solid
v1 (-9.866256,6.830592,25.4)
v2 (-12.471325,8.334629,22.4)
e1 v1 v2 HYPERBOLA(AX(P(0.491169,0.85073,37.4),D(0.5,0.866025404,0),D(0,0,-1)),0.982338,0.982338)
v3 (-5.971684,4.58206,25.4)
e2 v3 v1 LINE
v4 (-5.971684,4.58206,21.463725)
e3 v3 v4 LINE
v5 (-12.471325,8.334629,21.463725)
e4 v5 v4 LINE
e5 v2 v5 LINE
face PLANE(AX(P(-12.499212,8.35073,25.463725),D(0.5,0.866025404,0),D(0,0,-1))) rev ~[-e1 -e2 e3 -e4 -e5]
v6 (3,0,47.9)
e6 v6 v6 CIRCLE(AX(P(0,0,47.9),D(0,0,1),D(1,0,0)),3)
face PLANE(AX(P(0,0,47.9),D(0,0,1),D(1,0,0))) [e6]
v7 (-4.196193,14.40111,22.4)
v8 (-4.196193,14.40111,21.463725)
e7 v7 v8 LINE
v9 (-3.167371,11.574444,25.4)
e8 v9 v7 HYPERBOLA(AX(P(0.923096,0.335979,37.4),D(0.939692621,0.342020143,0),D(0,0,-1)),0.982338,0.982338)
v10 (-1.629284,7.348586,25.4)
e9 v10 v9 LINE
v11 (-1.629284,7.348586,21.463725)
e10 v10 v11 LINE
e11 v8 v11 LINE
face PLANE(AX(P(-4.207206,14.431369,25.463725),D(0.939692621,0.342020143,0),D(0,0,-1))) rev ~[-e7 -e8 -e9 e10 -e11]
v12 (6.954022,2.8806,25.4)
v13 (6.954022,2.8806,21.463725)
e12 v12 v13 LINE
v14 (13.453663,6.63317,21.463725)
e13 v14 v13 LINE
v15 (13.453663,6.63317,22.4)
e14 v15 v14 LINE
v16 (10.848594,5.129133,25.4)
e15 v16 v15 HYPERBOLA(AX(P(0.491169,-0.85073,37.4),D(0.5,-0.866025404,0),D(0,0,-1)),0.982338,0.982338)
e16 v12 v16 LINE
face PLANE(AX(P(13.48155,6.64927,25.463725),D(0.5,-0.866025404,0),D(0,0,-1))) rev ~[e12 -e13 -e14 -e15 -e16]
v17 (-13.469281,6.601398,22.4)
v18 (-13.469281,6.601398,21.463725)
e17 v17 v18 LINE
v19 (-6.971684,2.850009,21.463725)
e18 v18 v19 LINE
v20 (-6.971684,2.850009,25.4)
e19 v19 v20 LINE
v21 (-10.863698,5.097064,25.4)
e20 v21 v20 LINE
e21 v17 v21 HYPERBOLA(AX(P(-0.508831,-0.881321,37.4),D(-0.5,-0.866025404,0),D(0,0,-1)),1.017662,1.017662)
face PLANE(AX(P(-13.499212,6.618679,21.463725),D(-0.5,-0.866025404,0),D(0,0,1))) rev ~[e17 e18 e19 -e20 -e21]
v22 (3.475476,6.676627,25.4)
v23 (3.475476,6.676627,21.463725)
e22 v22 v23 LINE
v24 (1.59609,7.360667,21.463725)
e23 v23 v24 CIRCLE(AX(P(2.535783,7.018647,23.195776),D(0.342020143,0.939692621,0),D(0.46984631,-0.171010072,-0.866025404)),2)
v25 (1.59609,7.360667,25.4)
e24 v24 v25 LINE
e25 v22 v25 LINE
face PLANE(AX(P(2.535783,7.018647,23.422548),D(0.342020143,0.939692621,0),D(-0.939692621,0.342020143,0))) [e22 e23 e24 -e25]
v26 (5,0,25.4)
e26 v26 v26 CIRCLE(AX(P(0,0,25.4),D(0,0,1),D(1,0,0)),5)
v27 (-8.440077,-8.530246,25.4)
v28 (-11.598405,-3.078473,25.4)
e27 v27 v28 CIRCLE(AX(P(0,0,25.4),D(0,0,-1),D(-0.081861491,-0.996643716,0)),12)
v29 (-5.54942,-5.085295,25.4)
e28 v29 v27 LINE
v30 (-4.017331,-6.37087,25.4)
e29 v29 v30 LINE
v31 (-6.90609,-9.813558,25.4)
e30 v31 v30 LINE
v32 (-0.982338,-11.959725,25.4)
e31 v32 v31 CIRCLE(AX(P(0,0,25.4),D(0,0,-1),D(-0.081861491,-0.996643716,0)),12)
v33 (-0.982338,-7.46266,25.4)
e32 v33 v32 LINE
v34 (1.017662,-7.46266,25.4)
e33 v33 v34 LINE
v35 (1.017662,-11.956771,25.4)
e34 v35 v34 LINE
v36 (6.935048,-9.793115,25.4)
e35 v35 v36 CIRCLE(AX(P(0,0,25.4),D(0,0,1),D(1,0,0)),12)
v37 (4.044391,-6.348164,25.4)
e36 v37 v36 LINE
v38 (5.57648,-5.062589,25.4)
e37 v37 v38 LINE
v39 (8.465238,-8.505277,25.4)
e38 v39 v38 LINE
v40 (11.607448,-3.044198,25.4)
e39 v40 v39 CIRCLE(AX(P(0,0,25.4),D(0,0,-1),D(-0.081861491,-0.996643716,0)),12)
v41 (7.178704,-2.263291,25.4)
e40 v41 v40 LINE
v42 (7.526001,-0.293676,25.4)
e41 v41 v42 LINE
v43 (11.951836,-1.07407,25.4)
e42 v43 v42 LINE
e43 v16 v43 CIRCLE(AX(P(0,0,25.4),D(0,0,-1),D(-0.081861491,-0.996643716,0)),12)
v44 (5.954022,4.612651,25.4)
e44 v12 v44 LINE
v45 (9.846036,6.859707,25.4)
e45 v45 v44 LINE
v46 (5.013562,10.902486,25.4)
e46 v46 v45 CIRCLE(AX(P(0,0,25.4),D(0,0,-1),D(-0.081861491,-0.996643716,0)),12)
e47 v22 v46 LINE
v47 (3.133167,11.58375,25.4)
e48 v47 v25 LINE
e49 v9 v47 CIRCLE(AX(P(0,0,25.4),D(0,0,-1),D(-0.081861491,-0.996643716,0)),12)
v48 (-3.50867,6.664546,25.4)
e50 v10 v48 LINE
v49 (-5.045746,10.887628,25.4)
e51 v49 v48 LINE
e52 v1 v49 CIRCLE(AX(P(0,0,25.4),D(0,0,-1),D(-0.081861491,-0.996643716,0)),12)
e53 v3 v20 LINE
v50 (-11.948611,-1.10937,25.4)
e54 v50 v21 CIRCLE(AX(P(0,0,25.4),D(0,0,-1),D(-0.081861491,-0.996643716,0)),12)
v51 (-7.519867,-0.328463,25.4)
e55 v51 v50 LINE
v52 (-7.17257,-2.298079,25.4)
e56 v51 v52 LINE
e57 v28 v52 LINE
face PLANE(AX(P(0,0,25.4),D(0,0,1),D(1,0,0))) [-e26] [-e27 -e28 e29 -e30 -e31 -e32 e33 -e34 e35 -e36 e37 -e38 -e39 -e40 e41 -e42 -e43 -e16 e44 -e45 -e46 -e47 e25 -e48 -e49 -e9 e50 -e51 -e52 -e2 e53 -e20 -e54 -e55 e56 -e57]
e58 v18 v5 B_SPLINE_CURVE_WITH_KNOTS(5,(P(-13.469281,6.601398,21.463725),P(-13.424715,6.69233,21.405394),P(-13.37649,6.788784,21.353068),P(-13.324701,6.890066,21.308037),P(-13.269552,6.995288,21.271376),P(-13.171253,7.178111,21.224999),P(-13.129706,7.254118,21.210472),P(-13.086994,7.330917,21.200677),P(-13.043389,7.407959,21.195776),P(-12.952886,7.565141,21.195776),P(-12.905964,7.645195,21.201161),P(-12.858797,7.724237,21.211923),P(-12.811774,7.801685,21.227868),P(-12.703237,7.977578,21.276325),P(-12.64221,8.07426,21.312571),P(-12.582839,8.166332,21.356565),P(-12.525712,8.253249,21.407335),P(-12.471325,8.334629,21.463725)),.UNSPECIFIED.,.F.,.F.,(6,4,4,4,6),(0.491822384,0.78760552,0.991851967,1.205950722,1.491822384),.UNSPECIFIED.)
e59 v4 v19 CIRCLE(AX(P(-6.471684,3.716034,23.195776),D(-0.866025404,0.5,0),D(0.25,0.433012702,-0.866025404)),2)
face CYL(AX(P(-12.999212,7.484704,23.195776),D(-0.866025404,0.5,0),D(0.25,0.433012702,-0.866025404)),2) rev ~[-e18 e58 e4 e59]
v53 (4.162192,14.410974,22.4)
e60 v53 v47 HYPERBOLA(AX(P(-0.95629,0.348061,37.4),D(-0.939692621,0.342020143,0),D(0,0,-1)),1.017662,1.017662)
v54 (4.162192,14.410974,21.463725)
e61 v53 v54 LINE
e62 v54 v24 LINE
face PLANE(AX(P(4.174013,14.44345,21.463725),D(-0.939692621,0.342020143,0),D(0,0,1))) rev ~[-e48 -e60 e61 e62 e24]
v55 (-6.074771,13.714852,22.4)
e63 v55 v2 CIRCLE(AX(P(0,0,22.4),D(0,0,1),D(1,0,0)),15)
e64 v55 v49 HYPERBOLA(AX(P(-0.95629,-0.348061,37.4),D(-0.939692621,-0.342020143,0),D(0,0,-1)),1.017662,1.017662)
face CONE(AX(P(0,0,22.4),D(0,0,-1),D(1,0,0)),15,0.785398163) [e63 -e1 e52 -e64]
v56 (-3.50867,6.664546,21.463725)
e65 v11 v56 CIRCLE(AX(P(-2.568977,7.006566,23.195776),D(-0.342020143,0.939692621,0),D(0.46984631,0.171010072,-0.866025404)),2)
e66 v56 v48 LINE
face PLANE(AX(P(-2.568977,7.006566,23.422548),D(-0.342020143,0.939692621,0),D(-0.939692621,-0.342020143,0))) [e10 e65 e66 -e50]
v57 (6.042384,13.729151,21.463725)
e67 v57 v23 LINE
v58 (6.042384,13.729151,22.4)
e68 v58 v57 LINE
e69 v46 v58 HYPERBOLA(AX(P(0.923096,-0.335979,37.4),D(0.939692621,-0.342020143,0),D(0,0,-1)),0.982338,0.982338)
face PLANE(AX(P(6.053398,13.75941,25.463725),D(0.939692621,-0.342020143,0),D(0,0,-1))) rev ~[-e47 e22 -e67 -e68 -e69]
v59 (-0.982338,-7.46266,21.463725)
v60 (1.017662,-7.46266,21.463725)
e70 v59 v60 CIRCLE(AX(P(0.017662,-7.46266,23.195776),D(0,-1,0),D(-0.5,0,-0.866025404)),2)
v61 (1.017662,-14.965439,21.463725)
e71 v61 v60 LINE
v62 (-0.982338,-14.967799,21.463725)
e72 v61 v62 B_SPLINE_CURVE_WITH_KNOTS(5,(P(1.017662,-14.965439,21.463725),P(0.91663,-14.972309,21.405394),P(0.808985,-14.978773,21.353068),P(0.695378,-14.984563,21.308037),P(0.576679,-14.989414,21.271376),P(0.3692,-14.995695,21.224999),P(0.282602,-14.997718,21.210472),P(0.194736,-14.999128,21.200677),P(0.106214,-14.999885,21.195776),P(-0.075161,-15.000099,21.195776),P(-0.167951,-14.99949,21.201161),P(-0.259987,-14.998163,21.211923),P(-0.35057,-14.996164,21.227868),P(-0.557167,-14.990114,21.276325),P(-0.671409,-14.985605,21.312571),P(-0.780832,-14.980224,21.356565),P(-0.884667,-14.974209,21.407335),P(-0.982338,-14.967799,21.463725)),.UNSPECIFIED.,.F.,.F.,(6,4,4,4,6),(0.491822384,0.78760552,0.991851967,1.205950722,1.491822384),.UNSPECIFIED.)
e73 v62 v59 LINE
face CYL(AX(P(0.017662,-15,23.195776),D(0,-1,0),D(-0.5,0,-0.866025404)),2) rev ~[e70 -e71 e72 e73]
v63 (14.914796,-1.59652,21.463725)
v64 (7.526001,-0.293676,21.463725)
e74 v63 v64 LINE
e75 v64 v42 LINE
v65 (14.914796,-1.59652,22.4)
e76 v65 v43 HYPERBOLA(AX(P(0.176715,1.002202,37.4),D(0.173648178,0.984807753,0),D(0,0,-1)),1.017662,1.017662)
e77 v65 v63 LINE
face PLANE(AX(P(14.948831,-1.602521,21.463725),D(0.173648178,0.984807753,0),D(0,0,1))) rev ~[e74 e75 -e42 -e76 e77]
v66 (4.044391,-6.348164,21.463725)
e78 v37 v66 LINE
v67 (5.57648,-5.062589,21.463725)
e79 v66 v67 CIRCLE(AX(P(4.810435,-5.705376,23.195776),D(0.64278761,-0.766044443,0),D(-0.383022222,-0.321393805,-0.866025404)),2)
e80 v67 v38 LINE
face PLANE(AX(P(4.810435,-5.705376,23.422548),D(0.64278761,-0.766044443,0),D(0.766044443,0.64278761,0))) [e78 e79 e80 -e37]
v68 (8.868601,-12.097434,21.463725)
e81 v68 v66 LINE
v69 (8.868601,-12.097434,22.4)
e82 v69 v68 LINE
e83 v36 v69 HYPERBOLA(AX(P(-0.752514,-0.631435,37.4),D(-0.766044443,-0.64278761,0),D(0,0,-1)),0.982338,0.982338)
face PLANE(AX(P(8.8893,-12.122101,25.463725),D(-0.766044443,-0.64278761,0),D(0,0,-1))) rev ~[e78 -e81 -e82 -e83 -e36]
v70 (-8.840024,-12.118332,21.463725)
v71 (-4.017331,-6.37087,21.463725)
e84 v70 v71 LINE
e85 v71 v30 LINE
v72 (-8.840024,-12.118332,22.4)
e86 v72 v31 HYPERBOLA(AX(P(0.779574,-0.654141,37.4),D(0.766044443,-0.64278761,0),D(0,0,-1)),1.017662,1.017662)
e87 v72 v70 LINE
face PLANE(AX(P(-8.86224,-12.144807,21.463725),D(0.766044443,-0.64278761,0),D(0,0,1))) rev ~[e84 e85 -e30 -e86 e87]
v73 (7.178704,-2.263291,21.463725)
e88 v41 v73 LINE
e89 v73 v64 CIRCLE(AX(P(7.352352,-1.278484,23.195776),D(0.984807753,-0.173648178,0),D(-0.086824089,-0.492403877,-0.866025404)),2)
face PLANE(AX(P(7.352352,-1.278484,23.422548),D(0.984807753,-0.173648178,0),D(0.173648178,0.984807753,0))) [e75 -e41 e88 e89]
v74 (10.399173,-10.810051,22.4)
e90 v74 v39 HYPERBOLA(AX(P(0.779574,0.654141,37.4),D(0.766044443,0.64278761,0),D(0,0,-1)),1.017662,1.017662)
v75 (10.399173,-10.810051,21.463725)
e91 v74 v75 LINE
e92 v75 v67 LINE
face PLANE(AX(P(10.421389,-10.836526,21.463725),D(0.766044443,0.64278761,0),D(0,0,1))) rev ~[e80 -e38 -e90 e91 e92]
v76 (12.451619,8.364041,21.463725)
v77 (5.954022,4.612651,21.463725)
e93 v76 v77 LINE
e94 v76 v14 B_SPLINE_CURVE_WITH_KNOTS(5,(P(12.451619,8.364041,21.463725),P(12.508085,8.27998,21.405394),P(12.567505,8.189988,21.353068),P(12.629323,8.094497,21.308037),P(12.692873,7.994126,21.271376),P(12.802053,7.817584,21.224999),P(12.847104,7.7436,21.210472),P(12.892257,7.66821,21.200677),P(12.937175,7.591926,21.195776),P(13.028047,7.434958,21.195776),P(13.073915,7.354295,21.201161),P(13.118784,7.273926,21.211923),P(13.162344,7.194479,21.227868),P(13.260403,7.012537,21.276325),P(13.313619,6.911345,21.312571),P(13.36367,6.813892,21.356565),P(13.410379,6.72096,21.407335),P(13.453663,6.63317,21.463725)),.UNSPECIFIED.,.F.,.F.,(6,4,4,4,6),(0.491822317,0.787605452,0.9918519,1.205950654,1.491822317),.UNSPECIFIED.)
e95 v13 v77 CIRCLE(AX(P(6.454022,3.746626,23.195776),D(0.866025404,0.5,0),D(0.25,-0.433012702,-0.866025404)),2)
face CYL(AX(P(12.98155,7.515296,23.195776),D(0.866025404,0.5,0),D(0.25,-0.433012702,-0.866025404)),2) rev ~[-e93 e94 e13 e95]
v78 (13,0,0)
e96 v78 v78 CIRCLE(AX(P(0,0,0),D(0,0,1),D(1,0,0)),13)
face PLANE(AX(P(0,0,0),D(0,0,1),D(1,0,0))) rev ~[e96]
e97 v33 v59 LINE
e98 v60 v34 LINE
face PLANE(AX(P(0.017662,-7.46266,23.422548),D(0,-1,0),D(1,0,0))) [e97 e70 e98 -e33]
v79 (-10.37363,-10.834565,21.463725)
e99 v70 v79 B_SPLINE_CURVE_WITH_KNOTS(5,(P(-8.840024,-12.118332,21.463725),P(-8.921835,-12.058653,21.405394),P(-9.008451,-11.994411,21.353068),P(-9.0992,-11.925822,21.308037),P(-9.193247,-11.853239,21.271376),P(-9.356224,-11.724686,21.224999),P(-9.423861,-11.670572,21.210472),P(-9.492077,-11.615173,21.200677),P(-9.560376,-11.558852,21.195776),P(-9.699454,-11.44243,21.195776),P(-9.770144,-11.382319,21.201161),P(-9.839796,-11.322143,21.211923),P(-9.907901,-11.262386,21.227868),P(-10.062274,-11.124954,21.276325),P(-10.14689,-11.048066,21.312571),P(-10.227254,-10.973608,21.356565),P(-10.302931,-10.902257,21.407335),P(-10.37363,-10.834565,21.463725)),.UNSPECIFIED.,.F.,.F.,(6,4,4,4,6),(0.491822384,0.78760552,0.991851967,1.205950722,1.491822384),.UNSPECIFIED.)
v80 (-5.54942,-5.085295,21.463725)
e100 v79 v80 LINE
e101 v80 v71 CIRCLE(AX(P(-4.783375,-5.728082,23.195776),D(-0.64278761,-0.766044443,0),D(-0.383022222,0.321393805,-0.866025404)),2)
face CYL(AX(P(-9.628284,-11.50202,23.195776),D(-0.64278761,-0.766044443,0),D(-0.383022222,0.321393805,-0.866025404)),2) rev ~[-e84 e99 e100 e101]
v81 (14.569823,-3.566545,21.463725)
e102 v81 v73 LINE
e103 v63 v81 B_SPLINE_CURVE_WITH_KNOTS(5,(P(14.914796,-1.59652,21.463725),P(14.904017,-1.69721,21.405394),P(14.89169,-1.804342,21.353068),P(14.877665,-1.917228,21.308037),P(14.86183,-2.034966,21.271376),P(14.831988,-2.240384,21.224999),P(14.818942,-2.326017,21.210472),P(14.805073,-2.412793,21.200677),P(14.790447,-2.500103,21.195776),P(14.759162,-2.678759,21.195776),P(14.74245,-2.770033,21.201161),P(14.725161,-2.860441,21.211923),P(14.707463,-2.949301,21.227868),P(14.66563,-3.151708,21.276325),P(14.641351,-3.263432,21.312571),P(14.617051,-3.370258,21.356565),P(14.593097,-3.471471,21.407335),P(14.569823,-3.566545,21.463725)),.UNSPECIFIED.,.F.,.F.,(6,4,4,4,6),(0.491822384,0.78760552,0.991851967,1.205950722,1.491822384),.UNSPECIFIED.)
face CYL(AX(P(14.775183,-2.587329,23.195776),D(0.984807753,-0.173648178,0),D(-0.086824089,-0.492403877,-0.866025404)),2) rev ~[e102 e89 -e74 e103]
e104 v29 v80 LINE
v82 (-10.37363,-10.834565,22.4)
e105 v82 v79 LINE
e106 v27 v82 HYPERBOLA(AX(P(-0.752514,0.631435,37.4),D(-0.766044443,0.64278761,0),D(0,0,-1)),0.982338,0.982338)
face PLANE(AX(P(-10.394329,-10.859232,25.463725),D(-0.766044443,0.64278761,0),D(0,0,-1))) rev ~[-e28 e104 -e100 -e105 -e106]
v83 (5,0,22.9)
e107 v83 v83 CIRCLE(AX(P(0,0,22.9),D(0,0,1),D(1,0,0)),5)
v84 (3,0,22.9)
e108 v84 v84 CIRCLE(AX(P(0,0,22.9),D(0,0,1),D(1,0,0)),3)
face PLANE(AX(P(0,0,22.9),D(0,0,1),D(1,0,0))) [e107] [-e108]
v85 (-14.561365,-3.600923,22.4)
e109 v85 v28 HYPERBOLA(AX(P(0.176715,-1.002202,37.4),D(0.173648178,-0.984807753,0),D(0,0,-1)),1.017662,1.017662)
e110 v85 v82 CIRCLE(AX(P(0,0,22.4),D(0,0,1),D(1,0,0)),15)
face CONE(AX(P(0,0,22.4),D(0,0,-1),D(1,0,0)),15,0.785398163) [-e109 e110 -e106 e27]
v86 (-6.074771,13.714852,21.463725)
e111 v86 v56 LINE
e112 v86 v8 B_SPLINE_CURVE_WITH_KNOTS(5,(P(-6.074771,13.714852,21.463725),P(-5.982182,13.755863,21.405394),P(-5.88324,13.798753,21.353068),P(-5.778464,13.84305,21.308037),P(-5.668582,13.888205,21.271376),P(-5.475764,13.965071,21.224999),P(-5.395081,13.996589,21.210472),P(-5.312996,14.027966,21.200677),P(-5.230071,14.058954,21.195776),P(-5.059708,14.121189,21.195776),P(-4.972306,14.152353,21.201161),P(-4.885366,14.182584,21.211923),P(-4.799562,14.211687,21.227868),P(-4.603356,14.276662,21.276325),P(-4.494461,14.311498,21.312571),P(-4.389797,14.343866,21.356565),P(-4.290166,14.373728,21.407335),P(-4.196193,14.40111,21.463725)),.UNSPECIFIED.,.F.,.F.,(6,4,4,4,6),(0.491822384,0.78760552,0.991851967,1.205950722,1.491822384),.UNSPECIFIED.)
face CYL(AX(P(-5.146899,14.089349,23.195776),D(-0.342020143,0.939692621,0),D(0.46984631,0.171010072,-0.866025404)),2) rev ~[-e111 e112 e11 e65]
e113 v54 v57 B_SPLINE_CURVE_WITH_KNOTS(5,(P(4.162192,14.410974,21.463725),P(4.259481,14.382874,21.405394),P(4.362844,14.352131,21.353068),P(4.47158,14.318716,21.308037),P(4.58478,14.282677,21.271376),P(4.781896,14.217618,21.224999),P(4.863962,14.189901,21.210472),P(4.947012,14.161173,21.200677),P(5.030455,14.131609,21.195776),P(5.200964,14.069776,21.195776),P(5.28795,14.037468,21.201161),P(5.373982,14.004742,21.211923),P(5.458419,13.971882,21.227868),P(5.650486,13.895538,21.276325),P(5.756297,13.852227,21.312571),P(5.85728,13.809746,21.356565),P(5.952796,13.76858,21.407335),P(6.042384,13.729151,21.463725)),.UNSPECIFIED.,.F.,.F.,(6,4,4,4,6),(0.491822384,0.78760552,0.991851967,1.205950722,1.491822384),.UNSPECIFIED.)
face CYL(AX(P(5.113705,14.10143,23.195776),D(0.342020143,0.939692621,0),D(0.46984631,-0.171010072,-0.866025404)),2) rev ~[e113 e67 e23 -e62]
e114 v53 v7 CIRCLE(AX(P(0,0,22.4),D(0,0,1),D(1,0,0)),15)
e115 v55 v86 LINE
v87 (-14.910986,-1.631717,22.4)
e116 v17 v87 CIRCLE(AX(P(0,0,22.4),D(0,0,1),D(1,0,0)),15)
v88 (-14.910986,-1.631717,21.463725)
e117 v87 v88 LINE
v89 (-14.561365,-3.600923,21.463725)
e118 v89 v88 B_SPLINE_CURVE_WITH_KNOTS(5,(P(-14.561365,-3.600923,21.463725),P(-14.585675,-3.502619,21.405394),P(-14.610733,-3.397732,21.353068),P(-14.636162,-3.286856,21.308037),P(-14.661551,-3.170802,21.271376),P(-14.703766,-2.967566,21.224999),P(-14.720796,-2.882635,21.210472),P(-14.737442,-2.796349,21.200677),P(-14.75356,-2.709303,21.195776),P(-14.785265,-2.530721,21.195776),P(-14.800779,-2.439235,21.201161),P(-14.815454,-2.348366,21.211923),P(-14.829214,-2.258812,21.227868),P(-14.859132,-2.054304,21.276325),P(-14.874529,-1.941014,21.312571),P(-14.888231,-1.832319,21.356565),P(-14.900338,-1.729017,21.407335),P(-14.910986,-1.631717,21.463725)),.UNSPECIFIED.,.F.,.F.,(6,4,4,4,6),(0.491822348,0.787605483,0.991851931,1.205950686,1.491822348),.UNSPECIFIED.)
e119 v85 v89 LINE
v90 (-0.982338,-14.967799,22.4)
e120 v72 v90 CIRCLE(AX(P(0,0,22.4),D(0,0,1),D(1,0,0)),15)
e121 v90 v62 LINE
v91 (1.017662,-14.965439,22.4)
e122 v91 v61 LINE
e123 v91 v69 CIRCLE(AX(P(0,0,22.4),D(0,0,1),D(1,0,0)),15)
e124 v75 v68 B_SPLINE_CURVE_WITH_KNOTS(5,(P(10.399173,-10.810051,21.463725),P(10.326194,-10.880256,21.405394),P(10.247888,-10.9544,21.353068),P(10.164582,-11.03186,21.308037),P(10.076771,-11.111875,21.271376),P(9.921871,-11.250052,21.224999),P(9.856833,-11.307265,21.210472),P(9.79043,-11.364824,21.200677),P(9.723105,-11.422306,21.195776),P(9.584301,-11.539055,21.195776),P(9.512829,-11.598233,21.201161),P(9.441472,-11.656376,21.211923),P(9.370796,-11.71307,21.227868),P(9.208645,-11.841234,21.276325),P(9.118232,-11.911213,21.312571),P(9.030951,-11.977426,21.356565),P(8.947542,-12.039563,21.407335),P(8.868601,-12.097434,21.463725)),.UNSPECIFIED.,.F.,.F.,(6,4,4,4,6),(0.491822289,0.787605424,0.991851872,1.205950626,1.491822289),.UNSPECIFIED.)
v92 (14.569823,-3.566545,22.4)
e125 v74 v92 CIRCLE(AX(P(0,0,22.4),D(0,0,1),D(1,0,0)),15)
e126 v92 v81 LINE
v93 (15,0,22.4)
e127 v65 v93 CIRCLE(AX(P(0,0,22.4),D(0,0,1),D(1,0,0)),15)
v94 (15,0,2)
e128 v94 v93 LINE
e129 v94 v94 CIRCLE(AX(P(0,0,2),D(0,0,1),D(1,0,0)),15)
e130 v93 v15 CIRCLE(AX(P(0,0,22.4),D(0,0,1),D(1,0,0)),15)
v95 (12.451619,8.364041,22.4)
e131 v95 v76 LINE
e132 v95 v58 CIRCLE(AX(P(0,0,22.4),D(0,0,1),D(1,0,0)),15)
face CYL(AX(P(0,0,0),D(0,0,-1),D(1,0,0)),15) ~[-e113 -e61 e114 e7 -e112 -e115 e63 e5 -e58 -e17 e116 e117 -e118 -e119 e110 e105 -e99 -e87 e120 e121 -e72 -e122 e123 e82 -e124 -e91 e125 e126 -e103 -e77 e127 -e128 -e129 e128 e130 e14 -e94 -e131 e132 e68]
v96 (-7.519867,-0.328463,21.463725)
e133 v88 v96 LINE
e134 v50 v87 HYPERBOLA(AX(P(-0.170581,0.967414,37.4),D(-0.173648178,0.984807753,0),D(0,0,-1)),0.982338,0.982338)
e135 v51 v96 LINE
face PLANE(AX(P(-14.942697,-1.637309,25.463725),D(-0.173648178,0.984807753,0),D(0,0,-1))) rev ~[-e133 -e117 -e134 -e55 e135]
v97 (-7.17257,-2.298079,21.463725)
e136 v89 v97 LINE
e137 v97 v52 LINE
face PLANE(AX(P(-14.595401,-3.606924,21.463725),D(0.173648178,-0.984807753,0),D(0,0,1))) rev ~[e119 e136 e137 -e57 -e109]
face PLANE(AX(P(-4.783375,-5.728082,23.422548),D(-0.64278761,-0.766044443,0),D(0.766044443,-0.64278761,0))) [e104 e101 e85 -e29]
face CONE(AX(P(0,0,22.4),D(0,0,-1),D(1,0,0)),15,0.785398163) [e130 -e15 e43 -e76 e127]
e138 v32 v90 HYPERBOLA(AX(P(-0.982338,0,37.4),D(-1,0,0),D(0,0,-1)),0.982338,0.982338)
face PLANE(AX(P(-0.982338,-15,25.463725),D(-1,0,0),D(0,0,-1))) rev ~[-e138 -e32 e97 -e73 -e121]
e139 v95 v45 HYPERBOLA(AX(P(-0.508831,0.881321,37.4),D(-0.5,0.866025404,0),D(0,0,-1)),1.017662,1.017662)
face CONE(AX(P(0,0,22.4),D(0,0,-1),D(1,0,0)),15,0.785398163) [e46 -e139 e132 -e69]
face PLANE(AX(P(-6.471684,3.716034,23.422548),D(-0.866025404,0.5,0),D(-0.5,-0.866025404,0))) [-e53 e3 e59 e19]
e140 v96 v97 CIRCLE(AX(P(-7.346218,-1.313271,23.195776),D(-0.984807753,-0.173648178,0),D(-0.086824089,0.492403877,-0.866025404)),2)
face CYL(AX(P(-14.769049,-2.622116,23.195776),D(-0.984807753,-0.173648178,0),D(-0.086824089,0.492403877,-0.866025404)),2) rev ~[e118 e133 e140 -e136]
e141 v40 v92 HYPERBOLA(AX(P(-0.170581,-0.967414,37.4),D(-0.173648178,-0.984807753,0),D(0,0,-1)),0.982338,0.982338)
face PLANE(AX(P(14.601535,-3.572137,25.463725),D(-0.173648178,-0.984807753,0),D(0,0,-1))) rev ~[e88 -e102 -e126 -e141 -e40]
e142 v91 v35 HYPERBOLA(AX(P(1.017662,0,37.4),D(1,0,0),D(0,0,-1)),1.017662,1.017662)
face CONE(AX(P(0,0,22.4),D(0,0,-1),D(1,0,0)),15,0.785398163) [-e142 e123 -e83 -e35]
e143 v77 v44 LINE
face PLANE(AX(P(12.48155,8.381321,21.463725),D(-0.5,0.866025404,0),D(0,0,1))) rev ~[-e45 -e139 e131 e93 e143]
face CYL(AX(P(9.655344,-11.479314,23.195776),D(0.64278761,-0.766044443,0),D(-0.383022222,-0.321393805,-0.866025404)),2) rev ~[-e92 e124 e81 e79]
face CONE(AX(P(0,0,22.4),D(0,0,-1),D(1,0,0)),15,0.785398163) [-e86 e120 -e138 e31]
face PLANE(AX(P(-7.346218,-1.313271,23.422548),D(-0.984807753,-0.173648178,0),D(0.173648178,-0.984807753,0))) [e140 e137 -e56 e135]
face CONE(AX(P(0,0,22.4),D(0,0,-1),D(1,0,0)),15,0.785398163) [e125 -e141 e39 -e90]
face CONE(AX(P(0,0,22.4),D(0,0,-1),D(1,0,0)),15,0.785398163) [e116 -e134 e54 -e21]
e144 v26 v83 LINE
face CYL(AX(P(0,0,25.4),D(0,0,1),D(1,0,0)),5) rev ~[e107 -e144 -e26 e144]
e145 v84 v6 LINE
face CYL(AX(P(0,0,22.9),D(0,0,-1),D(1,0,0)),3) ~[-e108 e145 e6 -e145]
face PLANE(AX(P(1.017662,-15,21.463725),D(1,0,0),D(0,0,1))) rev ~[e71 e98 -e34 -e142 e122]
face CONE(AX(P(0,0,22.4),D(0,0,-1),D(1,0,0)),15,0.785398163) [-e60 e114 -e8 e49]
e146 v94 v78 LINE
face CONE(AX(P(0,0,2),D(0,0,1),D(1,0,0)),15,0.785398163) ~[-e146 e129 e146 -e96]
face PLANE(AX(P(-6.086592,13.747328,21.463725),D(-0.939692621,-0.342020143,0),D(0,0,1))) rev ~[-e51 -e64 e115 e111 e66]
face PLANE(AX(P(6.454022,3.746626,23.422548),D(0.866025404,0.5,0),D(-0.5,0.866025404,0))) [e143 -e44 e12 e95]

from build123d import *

# Parameters (mm, degrees)
F0_R             = 15
F1_DEPTH         = 25.4
F2_SIZE          = 3
F3_SIZE          = 2
F4_R             = 5
F5_DEPTH         = 2.5
F6_R             = 3
F7_DEPTH         = 25
F10_DEPTH        = 7.53734
F10_COPIES_COUNT = 9


# Not quite as in the source:
# - a pattern or mirror of a feature is missing from the dataset's text; its kind, count and spacing are read off the source's solid


with BuildPart() as f1:
    # F0 (on Top) → F1 (new body)
    with BuildSketch(Plane.XY):
        Circle(F0_R)
    extrude(amount=F1_DEPTH)

    # F2
    f2_edges = [f1.edges().sort_by_distance(p)[0] for p in [
        (-15, 0, 25.4),
    ]]
    chamfer(f2_edges, length=F2_SIZE)

    # F3
    f3_edges = [f1.edges().sort_by_distance(p)[0] for p in [
        (-15, 0, 0),
    ]]
    chamfer(f3_edges, length=F3_SIZE)

    # F4 (on face) → F5 (cut)
    with BuildSketch(Plane.XY.offset(25.4)):
        Circle(F4_R)
    extrude(amount=-F5_DEPTH, mode=Mode.SUBTRACT)

    # F6 (on face) → F7 (join)
    with BuildSketch(Plane.XY.offset(22.9)):
        Circle(F6_R)
    extrude(amount=F7_DEPTH)

    # F9 (on offset) → F10 (cut)
    with BuildSketch(Plane.XZ.offset(15)):
        with BuildLine():
            Line((1.0176621057, 25.4637251124), (-0.9823378943, 25.4637251124))
            Line((-0.9823378943, 25.4637251124), (-0.9823378943, 21.4637251124))
            ThreePointArc((-0.9823378943, 21.4637251124), (0.0176621057, 21.1957759199), (1.0176621057, 21.4637251124))
            Line((1.0176621057, 21.4637251124), (1.0176621057, 25.4637251124))
        make_face()
    f10 = extrude(amount=-F10_DEPTH, mode=Mode.SUBTRACT)

    # F10_copies: F10 ×9 about axis
    f10_copies_axis = Axis((0, 0, 0), (0, 0, 1))
    for i in range(1, F10_COPIES_COUNT):
        add(f10.rotate(f10_copies_axis, i * 360 / F10_COPIES_COUNT), mode=Mode.SUBTRACT)


solid = f1.part
